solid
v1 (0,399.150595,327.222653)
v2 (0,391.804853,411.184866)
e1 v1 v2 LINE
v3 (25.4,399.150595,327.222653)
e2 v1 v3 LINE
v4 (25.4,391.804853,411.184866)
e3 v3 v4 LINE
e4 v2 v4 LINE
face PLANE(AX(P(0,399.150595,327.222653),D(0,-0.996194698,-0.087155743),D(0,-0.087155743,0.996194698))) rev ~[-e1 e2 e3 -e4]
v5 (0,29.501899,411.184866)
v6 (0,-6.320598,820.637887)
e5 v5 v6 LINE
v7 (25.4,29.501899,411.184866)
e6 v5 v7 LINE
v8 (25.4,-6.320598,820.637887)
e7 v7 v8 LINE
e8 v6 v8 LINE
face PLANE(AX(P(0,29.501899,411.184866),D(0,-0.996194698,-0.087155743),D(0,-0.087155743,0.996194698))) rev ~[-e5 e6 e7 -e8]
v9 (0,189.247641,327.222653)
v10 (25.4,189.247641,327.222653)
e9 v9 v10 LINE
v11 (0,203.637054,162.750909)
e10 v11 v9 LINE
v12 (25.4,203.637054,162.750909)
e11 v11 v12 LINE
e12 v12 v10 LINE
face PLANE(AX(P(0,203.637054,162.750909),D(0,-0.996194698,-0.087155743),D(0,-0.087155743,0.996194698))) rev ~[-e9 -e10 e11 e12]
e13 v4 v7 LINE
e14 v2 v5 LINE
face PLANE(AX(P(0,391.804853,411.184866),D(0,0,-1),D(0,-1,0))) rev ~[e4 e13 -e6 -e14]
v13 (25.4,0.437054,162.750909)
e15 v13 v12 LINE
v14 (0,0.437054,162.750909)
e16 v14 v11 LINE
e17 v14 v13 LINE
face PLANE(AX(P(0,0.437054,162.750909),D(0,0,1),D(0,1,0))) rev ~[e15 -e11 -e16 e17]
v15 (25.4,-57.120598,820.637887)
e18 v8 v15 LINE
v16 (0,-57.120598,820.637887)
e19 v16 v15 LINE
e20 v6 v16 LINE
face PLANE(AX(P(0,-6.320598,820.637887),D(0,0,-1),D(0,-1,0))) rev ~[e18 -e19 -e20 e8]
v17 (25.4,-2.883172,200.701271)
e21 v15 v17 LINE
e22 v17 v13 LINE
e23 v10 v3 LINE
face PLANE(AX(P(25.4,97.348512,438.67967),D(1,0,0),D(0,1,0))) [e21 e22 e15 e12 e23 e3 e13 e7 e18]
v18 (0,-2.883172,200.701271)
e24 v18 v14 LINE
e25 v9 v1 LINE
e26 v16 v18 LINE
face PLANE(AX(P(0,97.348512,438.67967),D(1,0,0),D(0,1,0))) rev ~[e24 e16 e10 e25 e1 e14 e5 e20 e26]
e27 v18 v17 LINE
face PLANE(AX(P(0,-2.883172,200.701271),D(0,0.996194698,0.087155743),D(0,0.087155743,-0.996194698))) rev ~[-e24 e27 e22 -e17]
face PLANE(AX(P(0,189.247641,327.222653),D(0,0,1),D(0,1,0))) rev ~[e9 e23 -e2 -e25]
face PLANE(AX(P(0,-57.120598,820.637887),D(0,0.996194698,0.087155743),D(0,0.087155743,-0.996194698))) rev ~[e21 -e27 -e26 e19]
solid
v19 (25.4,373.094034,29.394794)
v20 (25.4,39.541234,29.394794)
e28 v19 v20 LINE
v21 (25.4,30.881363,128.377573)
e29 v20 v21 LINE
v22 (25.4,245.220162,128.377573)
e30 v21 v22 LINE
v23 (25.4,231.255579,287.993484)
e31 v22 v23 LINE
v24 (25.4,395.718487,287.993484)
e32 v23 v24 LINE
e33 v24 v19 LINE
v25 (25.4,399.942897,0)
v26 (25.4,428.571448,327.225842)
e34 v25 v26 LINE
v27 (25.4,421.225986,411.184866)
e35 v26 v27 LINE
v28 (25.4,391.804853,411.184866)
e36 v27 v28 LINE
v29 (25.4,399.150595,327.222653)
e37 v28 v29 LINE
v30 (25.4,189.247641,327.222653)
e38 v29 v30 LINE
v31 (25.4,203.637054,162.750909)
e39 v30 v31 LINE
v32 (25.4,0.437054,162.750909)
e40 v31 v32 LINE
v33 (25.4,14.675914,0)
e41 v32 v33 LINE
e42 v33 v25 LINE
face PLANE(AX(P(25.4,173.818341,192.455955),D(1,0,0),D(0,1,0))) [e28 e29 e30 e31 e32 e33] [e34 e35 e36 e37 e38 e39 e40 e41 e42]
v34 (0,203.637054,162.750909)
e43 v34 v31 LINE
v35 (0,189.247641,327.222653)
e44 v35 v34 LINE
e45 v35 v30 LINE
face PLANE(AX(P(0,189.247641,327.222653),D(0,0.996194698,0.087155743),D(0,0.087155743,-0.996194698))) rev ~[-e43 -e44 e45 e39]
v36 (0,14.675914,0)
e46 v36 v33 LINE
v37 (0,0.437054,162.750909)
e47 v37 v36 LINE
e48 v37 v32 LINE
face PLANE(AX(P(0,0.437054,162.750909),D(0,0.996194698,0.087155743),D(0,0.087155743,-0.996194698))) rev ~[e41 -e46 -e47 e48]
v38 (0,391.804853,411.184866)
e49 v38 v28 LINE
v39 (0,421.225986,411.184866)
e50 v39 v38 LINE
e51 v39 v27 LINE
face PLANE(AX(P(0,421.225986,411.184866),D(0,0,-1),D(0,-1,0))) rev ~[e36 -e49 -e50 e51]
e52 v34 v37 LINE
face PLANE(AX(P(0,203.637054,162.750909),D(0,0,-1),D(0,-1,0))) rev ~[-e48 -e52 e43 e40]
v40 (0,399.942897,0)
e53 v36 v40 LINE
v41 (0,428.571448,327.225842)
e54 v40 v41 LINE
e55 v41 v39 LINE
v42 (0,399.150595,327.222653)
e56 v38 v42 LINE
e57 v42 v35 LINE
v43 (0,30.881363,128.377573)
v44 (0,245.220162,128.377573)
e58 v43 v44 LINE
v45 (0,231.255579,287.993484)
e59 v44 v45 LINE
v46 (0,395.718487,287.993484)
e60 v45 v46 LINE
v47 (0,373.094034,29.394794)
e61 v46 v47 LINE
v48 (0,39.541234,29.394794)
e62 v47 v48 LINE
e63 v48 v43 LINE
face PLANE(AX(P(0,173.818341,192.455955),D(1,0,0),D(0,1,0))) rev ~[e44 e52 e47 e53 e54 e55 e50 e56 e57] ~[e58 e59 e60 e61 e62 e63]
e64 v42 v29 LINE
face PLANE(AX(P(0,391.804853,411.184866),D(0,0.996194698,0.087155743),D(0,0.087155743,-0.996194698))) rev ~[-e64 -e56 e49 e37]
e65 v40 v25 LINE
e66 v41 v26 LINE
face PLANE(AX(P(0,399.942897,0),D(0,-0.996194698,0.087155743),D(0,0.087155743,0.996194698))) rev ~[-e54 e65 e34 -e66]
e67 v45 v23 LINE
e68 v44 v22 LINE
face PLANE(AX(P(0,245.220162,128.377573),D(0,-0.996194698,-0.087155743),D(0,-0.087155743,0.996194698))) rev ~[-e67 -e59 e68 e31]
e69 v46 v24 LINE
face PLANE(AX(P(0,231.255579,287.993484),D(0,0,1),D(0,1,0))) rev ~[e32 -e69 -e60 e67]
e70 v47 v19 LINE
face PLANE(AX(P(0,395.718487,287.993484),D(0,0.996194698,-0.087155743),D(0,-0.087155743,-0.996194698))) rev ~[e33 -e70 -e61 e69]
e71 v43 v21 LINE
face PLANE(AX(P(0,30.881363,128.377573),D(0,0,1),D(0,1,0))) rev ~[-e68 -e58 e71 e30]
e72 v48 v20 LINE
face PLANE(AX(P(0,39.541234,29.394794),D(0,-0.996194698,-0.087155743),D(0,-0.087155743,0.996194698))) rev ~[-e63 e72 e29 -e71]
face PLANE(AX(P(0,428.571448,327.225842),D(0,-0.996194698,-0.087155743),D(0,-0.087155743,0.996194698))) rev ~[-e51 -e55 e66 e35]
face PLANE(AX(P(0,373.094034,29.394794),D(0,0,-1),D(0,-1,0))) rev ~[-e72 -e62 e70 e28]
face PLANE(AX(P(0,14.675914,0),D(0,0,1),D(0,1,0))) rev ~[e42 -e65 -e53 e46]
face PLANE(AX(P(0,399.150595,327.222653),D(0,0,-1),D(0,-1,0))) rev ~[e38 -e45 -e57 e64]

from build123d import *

# Parameters (mm, degrees)
F1_DEPTH = 25.4
F2_DEPTH = 25.4


# Not quite as in the source:
# - a feature names something its author has since deleted; it is built from what else it names


with BuildPart() as f1:
    # F0 (on Right) → F1 (new body)
    with BuildSketch(Plane.YZ):
        Polygon((-2.8831724243, 200.7012711329), (0.4370540533, 162.7509088374), (203.6370540533, 162.7509088374), (189.2476409256, 327.2226534924), (399.1505950094, 327.2226534924), (391.8048532493, 411.1848660134), (29.5018991655, 411.1848660134), (-6.3205984573, 820.6378874572), (-57.1205984573, 820.6378874572), (-21.1470656382, 409.4585258199), align=None)
    extrude(amount=F1_DEPTH)


with BuildPart() as f2:
    # F0 (on Right) → F2 (new body)
    with BuildSketch(Plane.YZ):
        Polygon((0.4370540533, 162.7509088374), (14.6759135551, 0), (42.1129448534, 0), (39.5412336167, 29.3947939436), (30.8813626048, 128.3775725444), (205.7059179631, 128.3775725444), (245.2201617377, 128.3775725444), (231.2555789637, 287.9934840373), (395.7184874025, 287.9934840373), (399.1505950094, 327.2226534924), (189.2476409256, 327.2226534924), (203.6370540533, 162.7509088374), align=None)
        Polygon((391.8048532493, 411.1848660134), (399.1505950094, 327.2226534924), (428.5714484425, 327.2258416546), (421.2259856104, 411.1848660134), align=None)
        Polygon((428.5714484425, 327.2258416546), (399.1505950094, 327.2226534924), (395.7184874025, 287.9934840373), (373.0940336167, 29.3947939436), (370.5223223799, 0), (399.942896885, 0), align=None)
        Polygon((39.5412336167, 29.3947939436), (42.1129448534, 0), (216.9375002117, 0), (256.4517439863, 0), (253.8800327496, 29.3947939436), align=None)
        Polygon((253.8800327496, 29.3947939436), (256.4517439863, 0), (370.5223223799, 0), (373.0940336167, 29.3947939436), align=None)
    extrude(amount=F2_DEPTH)


solid = Compound([f1.part, f2.part])
